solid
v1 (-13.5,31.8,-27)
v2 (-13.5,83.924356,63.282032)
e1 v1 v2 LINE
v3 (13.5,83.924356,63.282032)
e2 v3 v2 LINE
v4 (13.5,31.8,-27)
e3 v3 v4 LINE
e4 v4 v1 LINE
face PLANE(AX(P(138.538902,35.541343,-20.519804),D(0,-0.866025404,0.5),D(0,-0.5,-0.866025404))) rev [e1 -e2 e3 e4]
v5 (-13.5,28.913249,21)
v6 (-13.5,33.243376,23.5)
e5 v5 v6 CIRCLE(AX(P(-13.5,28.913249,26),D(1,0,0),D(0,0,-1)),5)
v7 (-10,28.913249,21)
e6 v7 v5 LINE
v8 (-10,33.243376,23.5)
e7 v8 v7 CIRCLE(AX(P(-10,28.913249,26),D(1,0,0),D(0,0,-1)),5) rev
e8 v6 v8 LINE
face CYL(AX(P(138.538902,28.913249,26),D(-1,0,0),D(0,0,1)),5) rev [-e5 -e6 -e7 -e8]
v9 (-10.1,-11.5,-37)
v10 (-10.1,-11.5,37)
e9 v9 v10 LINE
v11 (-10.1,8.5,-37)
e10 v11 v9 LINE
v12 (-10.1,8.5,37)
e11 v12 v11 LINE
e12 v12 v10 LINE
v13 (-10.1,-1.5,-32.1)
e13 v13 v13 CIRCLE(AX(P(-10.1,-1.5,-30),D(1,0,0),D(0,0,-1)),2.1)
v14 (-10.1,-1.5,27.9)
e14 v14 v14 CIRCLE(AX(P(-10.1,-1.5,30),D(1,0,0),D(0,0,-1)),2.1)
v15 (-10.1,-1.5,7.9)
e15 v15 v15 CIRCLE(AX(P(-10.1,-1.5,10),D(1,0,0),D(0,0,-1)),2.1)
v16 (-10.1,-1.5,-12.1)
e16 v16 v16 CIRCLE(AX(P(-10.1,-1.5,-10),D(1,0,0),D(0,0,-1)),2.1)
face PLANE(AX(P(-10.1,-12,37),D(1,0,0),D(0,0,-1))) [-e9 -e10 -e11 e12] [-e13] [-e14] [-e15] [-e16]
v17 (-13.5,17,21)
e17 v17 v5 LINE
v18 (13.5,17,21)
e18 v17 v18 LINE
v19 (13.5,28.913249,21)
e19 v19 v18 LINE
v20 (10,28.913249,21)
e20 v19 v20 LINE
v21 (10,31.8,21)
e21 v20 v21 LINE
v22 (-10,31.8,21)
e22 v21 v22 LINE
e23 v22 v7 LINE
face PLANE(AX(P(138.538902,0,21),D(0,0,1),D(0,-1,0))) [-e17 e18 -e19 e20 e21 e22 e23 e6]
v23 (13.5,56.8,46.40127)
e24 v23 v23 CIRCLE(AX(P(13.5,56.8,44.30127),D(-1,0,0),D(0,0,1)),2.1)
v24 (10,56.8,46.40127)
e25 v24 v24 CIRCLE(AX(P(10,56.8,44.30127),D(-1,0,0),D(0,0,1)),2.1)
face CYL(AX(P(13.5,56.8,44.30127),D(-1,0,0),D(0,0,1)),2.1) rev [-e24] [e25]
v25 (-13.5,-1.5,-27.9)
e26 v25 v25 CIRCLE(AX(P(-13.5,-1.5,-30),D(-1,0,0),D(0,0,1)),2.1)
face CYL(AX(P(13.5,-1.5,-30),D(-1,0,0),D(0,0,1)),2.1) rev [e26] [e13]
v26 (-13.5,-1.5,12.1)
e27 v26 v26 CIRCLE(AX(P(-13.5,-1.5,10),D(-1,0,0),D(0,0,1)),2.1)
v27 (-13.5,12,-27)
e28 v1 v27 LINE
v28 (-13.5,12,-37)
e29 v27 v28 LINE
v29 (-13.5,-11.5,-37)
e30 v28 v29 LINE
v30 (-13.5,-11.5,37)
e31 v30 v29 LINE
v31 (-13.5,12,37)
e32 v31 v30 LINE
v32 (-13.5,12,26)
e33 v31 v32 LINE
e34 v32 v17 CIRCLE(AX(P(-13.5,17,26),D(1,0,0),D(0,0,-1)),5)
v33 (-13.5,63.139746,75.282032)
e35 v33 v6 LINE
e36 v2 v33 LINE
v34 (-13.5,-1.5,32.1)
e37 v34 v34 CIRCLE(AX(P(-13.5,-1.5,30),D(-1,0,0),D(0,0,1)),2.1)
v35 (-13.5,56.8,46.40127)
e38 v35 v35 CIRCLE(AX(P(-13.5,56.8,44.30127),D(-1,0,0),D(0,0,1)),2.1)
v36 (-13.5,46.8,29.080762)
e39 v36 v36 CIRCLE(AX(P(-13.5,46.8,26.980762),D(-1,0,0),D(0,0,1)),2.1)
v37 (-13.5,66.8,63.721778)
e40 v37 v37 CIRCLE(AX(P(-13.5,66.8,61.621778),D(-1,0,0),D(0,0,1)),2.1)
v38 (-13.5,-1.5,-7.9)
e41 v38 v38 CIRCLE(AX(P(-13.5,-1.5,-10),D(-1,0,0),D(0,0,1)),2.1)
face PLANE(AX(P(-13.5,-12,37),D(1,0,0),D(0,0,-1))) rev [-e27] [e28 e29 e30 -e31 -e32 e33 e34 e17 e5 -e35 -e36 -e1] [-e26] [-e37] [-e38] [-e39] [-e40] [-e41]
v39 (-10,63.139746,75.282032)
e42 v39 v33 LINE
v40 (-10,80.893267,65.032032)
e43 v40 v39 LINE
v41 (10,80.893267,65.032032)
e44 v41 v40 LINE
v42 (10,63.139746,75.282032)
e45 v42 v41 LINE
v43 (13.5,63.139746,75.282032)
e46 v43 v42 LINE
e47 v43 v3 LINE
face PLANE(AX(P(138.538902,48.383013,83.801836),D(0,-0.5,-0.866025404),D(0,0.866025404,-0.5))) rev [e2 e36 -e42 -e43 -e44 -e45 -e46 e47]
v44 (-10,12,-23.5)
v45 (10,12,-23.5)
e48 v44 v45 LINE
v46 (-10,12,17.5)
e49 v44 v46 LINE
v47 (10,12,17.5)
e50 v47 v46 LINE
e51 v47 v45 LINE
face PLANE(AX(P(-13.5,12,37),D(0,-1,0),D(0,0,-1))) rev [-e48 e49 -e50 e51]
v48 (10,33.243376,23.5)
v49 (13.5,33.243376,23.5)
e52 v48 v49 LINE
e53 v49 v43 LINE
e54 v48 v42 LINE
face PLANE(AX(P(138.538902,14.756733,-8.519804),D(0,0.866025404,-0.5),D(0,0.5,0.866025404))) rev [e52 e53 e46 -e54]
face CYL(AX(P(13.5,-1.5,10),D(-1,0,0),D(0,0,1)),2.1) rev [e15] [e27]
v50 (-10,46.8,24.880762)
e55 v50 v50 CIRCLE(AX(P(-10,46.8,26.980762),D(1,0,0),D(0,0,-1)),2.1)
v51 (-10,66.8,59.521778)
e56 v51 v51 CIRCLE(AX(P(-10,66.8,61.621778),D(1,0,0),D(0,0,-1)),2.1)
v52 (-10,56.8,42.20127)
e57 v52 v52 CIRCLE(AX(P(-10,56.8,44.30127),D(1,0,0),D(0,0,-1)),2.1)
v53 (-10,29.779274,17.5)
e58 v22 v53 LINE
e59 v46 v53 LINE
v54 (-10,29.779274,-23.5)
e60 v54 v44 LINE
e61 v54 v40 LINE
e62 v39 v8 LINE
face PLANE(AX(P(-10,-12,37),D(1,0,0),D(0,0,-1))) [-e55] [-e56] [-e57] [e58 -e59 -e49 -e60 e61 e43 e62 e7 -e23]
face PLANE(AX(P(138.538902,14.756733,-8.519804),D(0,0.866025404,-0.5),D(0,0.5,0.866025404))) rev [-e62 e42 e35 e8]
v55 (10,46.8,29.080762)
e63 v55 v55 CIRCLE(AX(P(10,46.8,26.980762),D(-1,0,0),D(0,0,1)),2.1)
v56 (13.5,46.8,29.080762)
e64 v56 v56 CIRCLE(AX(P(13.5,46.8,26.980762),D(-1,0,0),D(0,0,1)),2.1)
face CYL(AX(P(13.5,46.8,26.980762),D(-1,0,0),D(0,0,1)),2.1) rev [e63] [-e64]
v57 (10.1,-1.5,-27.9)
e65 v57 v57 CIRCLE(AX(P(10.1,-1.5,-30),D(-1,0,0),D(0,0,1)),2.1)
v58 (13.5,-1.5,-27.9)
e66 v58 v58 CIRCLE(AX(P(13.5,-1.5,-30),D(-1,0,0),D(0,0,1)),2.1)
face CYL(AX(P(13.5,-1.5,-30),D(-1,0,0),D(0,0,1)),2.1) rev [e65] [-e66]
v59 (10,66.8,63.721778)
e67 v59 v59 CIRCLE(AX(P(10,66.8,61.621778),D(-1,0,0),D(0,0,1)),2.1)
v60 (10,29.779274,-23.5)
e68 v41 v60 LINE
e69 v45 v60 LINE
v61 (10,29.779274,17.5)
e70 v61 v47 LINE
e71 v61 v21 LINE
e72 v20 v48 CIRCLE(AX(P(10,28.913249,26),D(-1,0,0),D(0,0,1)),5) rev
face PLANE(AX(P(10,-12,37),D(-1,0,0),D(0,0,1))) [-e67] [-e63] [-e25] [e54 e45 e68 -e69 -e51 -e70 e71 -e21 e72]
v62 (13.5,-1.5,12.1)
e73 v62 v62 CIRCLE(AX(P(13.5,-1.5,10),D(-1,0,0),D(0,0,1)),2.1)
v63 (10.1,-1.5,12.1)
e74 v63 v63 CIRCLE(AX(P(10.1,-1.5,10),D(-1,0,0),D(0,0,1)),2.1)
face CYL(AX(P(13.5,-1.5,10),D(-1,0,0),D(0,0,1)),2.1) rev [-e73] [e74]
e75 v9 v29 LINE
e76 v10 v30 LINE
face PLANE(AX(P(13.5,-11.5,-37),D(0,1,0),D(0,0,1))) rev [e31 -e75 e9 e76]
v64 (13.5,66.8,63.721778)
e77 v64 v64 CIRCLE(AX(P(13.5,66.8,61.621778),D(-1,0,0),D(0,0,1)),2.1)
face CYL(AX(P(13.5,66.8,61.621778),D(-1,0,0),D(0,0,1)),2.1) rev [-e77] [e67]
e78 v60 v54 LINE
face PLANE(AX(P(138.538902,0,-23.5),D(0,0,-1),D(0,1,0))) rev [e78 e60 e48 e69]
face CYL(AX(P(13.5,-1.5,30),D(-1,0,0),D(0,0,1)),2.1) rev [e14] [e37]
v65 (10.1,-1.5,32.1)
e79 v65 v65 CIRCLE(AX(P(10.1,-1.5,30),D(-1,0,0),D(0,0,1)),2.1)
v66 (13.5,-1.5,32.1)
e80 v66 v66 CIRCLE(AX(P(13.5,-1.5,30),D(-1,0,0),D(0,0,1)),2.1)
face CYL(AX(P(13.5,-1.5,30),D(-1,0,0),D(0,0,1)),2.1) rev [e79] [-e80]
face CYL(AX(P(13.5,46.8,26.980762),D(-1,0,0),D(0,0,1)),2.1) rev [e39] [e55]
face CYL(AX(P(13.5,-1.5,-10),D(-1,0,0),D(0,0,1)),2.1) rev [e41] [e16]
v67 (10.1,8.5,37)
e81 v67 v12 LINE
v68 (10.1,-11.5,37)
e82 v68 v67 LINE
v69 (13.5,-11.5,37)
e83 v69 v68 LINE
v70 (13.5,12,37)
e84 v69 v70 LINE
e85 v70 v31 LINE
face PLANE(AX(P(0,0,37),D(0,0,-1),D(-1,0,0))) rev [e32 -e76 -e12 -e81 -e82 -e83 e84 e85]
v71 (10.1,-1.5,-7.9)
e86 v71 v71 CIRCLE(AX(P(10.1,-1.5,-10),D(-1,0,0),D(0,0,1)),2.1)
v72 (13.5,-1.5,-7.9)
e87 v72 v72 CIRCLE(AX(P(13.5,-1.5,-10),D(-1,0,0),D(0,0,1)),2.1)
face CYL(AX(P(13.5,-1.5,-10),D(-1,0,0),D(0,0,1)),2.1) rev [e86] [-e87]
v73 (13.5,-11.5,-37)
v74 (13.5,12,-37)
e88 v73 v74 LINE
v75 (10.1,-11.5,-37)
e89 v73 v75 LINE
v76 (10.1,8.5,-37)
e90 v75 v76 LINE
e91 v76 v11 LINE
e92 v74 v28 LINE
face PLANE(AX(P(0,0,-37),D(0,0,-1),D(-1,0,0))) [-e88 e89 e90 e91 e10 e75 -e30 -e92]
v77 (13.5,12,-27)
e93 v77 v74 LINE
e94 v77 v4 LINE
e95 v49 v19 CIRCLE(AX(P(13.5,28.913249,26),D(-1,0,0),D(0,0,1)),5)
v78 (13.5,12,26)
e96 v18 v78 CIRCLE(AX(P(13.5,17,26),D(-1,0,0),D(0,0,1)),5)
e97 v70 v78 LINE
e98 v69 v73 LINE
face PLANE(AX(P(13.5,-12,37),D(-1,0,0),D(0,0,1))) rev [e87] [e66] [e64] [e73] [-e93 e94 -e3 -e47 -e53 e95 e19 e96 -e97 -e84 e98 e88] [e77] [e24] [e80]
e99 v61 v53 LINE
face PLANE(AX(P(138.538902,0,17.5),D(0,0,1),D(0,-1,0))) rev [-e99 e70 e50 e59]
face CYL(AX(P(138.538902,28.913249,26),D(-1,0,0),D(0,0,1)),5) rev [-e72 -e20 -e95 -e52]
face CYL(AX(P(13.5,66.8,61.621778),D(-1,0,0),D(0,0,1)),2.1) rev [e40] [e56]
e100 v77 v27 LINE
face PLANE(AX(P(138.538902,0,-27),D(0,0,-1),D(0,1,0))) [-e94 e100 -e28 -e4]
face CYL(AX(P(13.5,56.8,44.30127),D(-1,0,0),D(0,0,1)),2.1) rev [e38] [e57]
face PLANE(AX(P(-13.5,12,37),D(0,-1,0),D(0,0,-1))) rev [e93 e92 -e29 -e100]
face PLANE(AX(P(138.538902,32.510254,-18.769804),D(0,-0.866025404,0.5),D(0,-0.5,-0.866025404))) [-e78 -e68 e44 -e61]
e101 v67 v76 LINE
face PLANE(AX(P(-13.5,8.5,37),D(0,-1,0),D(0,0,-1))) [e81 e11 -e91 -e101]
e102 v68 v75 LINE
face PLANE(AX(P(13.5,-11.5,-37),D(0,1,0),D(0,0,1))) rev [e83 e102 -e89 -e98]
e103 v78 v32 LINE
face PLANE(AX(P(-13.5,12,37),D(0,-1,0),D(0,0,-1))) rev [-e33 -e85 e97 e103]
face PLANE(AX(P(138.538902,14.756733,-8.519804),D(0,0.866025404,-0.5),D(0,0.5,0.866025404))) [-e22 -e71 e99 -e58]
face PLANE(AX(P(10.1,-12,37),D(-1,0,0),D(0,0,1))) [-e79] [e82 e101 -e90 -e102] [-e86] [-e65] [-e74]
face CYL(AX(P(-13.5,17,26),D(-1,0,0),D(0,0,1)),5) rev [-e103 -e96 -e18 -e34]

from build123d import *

# Parameters (mm, degrees)
SKETCH1_W           = 27
SKETCH1_H           = 24
BOSS_EXTRUDE1_DEPTH = 37
SHELL1_T            = -3.5
BOSS_EXTRUDE2_DEPTH = 27
SHELL2_START        = -10
SHELL2_DEPTH        = 20
SKETCH3_R           = 2.1
CUT_EXTRUDE1_DEPTH  = 116.92964185
MOVE_FACE1_BY       = 0.1
MOVE_FACE1_2_BY     = 0.1
SKETCH4_R           = 2.1
CUT_EXTRUDE2_DEPTH  = 116.92964185
FILLET1_R           = 5
SKETCH5_W           = 74
SKETCH5_H           = 0.5
CUT_EXTRUDE3_DEPTH  = 116.92964185


# Read off the part's stored shape, not the designer's step: Shell2
with BuildPart() as part:
    # Sketch1 → Boss-Extrude1 (new, symmetric)
    with BuildSketch(Plane.XY):
        Rectangle(SKETCH1_W, SKETCH1_H)
    extrude(amount=BOSS_EXTRUDE1_DEPTH, both=True)

    # Shell1
    shell1_openings = [part.faces().sort_by_distance(p)[0] for p in [
        (0, 0, 37),
        (0, 0, -37),
        (0, -12, 0),
    ]]
    offset(amount=SHELL1_T, openings=shell1_openings, kind=Kind.INTERSECTION)

    # Sketch2 → Boss-Extrude2 (add)
    with BuildSketch(Plane.ZY.offset(13.5)):
        Polygon((63.282032303, 83.924355653), (-27, 31.8), (-27, 12), (21, 12), (21, 31.8), (75.282032303, 63.139745962), align=None)
    extrude(amount=-BOSS_EXTRUDE2_DEPTH)

    # Shell2 outline → Shell2 (cut)
    with BuildSketch(Plane.YZ.offset(SHELL2_START)):
        Polygon((29.779274058, 17.5), (12, 17.5), (12, -23.5), (29.779274058, -23.5), (80.89326674, 65.032032303), (63.139745962, 75.282032303), (31.8, 21), align=None)
    extrude(amount=SHELL2_DEPTH, mode=Mode.SUBTRACT)

    # Sketch3 → Cut-Extrude1 (cut, through all)
    with BuildSketch(Plane.ZY.offset(13.5)):
        with Locations((-30, -1.5)):
            Circle(SKETCH3_R)
        with Locations((-10, -1.5)):
            Circle(SKETCH3_R)
        with Locations((10, -1.5)):
            Circle(SKETCH3_R)
        with Locations((30, -1.5)):
            Circle(SKETCH3_R)
    extrude(amount=-CUT_EXTRUDE1_DEPTH, mode=Mode.SUBTRACT)

    # Move Face1: a face moved inward by 0.1
    extrude(part.faces().sort_by_distance((10, -1.759479058, 0))[0], amount=MOVE_FACE1_BY, dir=(1, 0, 0), mode=Mode.SUBTRACT)

    # Move Face1 2: a face moved inward by 0.1
    extrude(part.faces().sort_by_distance((-10, -1.759479058, 0))[0], amount=MOVE_FACE1_2_BY, dir=(-1, 0, 0), mode=Mode.SUBTRACT)

    # Sketch4 → Cut-Extrude2 (cut, through all)
    with BuildSketch(Plane.ZY.offset(13.5)):
        with Locations((61.621778265, 66.8)):
            Circle(SKETCH4_R)
        with Locations((44.301270189, 56.8)):
            Circle(SKETCH4_R)
        with Locations((26.980762114, 46.8)):
            Circle(SKETCH4_R)
    extrude(amount=-CUT_EXTRUDE2_DEPTH, mode=Mode.SUBTRACT)

    # Fillet1
    fillet1_edges = [part.edges().sort_by_distance(p)[0] for p in [
        (11.75, 31.8, 21),
        (0, 12, 21),
        (-11.75, 31.8, 21),
    ]]
    fillet(fillet1_edges, radius=FILLET1_R)

    # Sketch5 → Cut-Extrude3 (cut, through all)
    with BuildSketch(Plane.ZY.offset(13.5)):
        with Locations((0, -11.75)):
            Rectangle(SKETCH5_W, SKETCH5_H)
    extrude(amount=-CUT_EXTRUDE3_DEPTH, mode=Mode.SUBTRACT)


solid = part.part
